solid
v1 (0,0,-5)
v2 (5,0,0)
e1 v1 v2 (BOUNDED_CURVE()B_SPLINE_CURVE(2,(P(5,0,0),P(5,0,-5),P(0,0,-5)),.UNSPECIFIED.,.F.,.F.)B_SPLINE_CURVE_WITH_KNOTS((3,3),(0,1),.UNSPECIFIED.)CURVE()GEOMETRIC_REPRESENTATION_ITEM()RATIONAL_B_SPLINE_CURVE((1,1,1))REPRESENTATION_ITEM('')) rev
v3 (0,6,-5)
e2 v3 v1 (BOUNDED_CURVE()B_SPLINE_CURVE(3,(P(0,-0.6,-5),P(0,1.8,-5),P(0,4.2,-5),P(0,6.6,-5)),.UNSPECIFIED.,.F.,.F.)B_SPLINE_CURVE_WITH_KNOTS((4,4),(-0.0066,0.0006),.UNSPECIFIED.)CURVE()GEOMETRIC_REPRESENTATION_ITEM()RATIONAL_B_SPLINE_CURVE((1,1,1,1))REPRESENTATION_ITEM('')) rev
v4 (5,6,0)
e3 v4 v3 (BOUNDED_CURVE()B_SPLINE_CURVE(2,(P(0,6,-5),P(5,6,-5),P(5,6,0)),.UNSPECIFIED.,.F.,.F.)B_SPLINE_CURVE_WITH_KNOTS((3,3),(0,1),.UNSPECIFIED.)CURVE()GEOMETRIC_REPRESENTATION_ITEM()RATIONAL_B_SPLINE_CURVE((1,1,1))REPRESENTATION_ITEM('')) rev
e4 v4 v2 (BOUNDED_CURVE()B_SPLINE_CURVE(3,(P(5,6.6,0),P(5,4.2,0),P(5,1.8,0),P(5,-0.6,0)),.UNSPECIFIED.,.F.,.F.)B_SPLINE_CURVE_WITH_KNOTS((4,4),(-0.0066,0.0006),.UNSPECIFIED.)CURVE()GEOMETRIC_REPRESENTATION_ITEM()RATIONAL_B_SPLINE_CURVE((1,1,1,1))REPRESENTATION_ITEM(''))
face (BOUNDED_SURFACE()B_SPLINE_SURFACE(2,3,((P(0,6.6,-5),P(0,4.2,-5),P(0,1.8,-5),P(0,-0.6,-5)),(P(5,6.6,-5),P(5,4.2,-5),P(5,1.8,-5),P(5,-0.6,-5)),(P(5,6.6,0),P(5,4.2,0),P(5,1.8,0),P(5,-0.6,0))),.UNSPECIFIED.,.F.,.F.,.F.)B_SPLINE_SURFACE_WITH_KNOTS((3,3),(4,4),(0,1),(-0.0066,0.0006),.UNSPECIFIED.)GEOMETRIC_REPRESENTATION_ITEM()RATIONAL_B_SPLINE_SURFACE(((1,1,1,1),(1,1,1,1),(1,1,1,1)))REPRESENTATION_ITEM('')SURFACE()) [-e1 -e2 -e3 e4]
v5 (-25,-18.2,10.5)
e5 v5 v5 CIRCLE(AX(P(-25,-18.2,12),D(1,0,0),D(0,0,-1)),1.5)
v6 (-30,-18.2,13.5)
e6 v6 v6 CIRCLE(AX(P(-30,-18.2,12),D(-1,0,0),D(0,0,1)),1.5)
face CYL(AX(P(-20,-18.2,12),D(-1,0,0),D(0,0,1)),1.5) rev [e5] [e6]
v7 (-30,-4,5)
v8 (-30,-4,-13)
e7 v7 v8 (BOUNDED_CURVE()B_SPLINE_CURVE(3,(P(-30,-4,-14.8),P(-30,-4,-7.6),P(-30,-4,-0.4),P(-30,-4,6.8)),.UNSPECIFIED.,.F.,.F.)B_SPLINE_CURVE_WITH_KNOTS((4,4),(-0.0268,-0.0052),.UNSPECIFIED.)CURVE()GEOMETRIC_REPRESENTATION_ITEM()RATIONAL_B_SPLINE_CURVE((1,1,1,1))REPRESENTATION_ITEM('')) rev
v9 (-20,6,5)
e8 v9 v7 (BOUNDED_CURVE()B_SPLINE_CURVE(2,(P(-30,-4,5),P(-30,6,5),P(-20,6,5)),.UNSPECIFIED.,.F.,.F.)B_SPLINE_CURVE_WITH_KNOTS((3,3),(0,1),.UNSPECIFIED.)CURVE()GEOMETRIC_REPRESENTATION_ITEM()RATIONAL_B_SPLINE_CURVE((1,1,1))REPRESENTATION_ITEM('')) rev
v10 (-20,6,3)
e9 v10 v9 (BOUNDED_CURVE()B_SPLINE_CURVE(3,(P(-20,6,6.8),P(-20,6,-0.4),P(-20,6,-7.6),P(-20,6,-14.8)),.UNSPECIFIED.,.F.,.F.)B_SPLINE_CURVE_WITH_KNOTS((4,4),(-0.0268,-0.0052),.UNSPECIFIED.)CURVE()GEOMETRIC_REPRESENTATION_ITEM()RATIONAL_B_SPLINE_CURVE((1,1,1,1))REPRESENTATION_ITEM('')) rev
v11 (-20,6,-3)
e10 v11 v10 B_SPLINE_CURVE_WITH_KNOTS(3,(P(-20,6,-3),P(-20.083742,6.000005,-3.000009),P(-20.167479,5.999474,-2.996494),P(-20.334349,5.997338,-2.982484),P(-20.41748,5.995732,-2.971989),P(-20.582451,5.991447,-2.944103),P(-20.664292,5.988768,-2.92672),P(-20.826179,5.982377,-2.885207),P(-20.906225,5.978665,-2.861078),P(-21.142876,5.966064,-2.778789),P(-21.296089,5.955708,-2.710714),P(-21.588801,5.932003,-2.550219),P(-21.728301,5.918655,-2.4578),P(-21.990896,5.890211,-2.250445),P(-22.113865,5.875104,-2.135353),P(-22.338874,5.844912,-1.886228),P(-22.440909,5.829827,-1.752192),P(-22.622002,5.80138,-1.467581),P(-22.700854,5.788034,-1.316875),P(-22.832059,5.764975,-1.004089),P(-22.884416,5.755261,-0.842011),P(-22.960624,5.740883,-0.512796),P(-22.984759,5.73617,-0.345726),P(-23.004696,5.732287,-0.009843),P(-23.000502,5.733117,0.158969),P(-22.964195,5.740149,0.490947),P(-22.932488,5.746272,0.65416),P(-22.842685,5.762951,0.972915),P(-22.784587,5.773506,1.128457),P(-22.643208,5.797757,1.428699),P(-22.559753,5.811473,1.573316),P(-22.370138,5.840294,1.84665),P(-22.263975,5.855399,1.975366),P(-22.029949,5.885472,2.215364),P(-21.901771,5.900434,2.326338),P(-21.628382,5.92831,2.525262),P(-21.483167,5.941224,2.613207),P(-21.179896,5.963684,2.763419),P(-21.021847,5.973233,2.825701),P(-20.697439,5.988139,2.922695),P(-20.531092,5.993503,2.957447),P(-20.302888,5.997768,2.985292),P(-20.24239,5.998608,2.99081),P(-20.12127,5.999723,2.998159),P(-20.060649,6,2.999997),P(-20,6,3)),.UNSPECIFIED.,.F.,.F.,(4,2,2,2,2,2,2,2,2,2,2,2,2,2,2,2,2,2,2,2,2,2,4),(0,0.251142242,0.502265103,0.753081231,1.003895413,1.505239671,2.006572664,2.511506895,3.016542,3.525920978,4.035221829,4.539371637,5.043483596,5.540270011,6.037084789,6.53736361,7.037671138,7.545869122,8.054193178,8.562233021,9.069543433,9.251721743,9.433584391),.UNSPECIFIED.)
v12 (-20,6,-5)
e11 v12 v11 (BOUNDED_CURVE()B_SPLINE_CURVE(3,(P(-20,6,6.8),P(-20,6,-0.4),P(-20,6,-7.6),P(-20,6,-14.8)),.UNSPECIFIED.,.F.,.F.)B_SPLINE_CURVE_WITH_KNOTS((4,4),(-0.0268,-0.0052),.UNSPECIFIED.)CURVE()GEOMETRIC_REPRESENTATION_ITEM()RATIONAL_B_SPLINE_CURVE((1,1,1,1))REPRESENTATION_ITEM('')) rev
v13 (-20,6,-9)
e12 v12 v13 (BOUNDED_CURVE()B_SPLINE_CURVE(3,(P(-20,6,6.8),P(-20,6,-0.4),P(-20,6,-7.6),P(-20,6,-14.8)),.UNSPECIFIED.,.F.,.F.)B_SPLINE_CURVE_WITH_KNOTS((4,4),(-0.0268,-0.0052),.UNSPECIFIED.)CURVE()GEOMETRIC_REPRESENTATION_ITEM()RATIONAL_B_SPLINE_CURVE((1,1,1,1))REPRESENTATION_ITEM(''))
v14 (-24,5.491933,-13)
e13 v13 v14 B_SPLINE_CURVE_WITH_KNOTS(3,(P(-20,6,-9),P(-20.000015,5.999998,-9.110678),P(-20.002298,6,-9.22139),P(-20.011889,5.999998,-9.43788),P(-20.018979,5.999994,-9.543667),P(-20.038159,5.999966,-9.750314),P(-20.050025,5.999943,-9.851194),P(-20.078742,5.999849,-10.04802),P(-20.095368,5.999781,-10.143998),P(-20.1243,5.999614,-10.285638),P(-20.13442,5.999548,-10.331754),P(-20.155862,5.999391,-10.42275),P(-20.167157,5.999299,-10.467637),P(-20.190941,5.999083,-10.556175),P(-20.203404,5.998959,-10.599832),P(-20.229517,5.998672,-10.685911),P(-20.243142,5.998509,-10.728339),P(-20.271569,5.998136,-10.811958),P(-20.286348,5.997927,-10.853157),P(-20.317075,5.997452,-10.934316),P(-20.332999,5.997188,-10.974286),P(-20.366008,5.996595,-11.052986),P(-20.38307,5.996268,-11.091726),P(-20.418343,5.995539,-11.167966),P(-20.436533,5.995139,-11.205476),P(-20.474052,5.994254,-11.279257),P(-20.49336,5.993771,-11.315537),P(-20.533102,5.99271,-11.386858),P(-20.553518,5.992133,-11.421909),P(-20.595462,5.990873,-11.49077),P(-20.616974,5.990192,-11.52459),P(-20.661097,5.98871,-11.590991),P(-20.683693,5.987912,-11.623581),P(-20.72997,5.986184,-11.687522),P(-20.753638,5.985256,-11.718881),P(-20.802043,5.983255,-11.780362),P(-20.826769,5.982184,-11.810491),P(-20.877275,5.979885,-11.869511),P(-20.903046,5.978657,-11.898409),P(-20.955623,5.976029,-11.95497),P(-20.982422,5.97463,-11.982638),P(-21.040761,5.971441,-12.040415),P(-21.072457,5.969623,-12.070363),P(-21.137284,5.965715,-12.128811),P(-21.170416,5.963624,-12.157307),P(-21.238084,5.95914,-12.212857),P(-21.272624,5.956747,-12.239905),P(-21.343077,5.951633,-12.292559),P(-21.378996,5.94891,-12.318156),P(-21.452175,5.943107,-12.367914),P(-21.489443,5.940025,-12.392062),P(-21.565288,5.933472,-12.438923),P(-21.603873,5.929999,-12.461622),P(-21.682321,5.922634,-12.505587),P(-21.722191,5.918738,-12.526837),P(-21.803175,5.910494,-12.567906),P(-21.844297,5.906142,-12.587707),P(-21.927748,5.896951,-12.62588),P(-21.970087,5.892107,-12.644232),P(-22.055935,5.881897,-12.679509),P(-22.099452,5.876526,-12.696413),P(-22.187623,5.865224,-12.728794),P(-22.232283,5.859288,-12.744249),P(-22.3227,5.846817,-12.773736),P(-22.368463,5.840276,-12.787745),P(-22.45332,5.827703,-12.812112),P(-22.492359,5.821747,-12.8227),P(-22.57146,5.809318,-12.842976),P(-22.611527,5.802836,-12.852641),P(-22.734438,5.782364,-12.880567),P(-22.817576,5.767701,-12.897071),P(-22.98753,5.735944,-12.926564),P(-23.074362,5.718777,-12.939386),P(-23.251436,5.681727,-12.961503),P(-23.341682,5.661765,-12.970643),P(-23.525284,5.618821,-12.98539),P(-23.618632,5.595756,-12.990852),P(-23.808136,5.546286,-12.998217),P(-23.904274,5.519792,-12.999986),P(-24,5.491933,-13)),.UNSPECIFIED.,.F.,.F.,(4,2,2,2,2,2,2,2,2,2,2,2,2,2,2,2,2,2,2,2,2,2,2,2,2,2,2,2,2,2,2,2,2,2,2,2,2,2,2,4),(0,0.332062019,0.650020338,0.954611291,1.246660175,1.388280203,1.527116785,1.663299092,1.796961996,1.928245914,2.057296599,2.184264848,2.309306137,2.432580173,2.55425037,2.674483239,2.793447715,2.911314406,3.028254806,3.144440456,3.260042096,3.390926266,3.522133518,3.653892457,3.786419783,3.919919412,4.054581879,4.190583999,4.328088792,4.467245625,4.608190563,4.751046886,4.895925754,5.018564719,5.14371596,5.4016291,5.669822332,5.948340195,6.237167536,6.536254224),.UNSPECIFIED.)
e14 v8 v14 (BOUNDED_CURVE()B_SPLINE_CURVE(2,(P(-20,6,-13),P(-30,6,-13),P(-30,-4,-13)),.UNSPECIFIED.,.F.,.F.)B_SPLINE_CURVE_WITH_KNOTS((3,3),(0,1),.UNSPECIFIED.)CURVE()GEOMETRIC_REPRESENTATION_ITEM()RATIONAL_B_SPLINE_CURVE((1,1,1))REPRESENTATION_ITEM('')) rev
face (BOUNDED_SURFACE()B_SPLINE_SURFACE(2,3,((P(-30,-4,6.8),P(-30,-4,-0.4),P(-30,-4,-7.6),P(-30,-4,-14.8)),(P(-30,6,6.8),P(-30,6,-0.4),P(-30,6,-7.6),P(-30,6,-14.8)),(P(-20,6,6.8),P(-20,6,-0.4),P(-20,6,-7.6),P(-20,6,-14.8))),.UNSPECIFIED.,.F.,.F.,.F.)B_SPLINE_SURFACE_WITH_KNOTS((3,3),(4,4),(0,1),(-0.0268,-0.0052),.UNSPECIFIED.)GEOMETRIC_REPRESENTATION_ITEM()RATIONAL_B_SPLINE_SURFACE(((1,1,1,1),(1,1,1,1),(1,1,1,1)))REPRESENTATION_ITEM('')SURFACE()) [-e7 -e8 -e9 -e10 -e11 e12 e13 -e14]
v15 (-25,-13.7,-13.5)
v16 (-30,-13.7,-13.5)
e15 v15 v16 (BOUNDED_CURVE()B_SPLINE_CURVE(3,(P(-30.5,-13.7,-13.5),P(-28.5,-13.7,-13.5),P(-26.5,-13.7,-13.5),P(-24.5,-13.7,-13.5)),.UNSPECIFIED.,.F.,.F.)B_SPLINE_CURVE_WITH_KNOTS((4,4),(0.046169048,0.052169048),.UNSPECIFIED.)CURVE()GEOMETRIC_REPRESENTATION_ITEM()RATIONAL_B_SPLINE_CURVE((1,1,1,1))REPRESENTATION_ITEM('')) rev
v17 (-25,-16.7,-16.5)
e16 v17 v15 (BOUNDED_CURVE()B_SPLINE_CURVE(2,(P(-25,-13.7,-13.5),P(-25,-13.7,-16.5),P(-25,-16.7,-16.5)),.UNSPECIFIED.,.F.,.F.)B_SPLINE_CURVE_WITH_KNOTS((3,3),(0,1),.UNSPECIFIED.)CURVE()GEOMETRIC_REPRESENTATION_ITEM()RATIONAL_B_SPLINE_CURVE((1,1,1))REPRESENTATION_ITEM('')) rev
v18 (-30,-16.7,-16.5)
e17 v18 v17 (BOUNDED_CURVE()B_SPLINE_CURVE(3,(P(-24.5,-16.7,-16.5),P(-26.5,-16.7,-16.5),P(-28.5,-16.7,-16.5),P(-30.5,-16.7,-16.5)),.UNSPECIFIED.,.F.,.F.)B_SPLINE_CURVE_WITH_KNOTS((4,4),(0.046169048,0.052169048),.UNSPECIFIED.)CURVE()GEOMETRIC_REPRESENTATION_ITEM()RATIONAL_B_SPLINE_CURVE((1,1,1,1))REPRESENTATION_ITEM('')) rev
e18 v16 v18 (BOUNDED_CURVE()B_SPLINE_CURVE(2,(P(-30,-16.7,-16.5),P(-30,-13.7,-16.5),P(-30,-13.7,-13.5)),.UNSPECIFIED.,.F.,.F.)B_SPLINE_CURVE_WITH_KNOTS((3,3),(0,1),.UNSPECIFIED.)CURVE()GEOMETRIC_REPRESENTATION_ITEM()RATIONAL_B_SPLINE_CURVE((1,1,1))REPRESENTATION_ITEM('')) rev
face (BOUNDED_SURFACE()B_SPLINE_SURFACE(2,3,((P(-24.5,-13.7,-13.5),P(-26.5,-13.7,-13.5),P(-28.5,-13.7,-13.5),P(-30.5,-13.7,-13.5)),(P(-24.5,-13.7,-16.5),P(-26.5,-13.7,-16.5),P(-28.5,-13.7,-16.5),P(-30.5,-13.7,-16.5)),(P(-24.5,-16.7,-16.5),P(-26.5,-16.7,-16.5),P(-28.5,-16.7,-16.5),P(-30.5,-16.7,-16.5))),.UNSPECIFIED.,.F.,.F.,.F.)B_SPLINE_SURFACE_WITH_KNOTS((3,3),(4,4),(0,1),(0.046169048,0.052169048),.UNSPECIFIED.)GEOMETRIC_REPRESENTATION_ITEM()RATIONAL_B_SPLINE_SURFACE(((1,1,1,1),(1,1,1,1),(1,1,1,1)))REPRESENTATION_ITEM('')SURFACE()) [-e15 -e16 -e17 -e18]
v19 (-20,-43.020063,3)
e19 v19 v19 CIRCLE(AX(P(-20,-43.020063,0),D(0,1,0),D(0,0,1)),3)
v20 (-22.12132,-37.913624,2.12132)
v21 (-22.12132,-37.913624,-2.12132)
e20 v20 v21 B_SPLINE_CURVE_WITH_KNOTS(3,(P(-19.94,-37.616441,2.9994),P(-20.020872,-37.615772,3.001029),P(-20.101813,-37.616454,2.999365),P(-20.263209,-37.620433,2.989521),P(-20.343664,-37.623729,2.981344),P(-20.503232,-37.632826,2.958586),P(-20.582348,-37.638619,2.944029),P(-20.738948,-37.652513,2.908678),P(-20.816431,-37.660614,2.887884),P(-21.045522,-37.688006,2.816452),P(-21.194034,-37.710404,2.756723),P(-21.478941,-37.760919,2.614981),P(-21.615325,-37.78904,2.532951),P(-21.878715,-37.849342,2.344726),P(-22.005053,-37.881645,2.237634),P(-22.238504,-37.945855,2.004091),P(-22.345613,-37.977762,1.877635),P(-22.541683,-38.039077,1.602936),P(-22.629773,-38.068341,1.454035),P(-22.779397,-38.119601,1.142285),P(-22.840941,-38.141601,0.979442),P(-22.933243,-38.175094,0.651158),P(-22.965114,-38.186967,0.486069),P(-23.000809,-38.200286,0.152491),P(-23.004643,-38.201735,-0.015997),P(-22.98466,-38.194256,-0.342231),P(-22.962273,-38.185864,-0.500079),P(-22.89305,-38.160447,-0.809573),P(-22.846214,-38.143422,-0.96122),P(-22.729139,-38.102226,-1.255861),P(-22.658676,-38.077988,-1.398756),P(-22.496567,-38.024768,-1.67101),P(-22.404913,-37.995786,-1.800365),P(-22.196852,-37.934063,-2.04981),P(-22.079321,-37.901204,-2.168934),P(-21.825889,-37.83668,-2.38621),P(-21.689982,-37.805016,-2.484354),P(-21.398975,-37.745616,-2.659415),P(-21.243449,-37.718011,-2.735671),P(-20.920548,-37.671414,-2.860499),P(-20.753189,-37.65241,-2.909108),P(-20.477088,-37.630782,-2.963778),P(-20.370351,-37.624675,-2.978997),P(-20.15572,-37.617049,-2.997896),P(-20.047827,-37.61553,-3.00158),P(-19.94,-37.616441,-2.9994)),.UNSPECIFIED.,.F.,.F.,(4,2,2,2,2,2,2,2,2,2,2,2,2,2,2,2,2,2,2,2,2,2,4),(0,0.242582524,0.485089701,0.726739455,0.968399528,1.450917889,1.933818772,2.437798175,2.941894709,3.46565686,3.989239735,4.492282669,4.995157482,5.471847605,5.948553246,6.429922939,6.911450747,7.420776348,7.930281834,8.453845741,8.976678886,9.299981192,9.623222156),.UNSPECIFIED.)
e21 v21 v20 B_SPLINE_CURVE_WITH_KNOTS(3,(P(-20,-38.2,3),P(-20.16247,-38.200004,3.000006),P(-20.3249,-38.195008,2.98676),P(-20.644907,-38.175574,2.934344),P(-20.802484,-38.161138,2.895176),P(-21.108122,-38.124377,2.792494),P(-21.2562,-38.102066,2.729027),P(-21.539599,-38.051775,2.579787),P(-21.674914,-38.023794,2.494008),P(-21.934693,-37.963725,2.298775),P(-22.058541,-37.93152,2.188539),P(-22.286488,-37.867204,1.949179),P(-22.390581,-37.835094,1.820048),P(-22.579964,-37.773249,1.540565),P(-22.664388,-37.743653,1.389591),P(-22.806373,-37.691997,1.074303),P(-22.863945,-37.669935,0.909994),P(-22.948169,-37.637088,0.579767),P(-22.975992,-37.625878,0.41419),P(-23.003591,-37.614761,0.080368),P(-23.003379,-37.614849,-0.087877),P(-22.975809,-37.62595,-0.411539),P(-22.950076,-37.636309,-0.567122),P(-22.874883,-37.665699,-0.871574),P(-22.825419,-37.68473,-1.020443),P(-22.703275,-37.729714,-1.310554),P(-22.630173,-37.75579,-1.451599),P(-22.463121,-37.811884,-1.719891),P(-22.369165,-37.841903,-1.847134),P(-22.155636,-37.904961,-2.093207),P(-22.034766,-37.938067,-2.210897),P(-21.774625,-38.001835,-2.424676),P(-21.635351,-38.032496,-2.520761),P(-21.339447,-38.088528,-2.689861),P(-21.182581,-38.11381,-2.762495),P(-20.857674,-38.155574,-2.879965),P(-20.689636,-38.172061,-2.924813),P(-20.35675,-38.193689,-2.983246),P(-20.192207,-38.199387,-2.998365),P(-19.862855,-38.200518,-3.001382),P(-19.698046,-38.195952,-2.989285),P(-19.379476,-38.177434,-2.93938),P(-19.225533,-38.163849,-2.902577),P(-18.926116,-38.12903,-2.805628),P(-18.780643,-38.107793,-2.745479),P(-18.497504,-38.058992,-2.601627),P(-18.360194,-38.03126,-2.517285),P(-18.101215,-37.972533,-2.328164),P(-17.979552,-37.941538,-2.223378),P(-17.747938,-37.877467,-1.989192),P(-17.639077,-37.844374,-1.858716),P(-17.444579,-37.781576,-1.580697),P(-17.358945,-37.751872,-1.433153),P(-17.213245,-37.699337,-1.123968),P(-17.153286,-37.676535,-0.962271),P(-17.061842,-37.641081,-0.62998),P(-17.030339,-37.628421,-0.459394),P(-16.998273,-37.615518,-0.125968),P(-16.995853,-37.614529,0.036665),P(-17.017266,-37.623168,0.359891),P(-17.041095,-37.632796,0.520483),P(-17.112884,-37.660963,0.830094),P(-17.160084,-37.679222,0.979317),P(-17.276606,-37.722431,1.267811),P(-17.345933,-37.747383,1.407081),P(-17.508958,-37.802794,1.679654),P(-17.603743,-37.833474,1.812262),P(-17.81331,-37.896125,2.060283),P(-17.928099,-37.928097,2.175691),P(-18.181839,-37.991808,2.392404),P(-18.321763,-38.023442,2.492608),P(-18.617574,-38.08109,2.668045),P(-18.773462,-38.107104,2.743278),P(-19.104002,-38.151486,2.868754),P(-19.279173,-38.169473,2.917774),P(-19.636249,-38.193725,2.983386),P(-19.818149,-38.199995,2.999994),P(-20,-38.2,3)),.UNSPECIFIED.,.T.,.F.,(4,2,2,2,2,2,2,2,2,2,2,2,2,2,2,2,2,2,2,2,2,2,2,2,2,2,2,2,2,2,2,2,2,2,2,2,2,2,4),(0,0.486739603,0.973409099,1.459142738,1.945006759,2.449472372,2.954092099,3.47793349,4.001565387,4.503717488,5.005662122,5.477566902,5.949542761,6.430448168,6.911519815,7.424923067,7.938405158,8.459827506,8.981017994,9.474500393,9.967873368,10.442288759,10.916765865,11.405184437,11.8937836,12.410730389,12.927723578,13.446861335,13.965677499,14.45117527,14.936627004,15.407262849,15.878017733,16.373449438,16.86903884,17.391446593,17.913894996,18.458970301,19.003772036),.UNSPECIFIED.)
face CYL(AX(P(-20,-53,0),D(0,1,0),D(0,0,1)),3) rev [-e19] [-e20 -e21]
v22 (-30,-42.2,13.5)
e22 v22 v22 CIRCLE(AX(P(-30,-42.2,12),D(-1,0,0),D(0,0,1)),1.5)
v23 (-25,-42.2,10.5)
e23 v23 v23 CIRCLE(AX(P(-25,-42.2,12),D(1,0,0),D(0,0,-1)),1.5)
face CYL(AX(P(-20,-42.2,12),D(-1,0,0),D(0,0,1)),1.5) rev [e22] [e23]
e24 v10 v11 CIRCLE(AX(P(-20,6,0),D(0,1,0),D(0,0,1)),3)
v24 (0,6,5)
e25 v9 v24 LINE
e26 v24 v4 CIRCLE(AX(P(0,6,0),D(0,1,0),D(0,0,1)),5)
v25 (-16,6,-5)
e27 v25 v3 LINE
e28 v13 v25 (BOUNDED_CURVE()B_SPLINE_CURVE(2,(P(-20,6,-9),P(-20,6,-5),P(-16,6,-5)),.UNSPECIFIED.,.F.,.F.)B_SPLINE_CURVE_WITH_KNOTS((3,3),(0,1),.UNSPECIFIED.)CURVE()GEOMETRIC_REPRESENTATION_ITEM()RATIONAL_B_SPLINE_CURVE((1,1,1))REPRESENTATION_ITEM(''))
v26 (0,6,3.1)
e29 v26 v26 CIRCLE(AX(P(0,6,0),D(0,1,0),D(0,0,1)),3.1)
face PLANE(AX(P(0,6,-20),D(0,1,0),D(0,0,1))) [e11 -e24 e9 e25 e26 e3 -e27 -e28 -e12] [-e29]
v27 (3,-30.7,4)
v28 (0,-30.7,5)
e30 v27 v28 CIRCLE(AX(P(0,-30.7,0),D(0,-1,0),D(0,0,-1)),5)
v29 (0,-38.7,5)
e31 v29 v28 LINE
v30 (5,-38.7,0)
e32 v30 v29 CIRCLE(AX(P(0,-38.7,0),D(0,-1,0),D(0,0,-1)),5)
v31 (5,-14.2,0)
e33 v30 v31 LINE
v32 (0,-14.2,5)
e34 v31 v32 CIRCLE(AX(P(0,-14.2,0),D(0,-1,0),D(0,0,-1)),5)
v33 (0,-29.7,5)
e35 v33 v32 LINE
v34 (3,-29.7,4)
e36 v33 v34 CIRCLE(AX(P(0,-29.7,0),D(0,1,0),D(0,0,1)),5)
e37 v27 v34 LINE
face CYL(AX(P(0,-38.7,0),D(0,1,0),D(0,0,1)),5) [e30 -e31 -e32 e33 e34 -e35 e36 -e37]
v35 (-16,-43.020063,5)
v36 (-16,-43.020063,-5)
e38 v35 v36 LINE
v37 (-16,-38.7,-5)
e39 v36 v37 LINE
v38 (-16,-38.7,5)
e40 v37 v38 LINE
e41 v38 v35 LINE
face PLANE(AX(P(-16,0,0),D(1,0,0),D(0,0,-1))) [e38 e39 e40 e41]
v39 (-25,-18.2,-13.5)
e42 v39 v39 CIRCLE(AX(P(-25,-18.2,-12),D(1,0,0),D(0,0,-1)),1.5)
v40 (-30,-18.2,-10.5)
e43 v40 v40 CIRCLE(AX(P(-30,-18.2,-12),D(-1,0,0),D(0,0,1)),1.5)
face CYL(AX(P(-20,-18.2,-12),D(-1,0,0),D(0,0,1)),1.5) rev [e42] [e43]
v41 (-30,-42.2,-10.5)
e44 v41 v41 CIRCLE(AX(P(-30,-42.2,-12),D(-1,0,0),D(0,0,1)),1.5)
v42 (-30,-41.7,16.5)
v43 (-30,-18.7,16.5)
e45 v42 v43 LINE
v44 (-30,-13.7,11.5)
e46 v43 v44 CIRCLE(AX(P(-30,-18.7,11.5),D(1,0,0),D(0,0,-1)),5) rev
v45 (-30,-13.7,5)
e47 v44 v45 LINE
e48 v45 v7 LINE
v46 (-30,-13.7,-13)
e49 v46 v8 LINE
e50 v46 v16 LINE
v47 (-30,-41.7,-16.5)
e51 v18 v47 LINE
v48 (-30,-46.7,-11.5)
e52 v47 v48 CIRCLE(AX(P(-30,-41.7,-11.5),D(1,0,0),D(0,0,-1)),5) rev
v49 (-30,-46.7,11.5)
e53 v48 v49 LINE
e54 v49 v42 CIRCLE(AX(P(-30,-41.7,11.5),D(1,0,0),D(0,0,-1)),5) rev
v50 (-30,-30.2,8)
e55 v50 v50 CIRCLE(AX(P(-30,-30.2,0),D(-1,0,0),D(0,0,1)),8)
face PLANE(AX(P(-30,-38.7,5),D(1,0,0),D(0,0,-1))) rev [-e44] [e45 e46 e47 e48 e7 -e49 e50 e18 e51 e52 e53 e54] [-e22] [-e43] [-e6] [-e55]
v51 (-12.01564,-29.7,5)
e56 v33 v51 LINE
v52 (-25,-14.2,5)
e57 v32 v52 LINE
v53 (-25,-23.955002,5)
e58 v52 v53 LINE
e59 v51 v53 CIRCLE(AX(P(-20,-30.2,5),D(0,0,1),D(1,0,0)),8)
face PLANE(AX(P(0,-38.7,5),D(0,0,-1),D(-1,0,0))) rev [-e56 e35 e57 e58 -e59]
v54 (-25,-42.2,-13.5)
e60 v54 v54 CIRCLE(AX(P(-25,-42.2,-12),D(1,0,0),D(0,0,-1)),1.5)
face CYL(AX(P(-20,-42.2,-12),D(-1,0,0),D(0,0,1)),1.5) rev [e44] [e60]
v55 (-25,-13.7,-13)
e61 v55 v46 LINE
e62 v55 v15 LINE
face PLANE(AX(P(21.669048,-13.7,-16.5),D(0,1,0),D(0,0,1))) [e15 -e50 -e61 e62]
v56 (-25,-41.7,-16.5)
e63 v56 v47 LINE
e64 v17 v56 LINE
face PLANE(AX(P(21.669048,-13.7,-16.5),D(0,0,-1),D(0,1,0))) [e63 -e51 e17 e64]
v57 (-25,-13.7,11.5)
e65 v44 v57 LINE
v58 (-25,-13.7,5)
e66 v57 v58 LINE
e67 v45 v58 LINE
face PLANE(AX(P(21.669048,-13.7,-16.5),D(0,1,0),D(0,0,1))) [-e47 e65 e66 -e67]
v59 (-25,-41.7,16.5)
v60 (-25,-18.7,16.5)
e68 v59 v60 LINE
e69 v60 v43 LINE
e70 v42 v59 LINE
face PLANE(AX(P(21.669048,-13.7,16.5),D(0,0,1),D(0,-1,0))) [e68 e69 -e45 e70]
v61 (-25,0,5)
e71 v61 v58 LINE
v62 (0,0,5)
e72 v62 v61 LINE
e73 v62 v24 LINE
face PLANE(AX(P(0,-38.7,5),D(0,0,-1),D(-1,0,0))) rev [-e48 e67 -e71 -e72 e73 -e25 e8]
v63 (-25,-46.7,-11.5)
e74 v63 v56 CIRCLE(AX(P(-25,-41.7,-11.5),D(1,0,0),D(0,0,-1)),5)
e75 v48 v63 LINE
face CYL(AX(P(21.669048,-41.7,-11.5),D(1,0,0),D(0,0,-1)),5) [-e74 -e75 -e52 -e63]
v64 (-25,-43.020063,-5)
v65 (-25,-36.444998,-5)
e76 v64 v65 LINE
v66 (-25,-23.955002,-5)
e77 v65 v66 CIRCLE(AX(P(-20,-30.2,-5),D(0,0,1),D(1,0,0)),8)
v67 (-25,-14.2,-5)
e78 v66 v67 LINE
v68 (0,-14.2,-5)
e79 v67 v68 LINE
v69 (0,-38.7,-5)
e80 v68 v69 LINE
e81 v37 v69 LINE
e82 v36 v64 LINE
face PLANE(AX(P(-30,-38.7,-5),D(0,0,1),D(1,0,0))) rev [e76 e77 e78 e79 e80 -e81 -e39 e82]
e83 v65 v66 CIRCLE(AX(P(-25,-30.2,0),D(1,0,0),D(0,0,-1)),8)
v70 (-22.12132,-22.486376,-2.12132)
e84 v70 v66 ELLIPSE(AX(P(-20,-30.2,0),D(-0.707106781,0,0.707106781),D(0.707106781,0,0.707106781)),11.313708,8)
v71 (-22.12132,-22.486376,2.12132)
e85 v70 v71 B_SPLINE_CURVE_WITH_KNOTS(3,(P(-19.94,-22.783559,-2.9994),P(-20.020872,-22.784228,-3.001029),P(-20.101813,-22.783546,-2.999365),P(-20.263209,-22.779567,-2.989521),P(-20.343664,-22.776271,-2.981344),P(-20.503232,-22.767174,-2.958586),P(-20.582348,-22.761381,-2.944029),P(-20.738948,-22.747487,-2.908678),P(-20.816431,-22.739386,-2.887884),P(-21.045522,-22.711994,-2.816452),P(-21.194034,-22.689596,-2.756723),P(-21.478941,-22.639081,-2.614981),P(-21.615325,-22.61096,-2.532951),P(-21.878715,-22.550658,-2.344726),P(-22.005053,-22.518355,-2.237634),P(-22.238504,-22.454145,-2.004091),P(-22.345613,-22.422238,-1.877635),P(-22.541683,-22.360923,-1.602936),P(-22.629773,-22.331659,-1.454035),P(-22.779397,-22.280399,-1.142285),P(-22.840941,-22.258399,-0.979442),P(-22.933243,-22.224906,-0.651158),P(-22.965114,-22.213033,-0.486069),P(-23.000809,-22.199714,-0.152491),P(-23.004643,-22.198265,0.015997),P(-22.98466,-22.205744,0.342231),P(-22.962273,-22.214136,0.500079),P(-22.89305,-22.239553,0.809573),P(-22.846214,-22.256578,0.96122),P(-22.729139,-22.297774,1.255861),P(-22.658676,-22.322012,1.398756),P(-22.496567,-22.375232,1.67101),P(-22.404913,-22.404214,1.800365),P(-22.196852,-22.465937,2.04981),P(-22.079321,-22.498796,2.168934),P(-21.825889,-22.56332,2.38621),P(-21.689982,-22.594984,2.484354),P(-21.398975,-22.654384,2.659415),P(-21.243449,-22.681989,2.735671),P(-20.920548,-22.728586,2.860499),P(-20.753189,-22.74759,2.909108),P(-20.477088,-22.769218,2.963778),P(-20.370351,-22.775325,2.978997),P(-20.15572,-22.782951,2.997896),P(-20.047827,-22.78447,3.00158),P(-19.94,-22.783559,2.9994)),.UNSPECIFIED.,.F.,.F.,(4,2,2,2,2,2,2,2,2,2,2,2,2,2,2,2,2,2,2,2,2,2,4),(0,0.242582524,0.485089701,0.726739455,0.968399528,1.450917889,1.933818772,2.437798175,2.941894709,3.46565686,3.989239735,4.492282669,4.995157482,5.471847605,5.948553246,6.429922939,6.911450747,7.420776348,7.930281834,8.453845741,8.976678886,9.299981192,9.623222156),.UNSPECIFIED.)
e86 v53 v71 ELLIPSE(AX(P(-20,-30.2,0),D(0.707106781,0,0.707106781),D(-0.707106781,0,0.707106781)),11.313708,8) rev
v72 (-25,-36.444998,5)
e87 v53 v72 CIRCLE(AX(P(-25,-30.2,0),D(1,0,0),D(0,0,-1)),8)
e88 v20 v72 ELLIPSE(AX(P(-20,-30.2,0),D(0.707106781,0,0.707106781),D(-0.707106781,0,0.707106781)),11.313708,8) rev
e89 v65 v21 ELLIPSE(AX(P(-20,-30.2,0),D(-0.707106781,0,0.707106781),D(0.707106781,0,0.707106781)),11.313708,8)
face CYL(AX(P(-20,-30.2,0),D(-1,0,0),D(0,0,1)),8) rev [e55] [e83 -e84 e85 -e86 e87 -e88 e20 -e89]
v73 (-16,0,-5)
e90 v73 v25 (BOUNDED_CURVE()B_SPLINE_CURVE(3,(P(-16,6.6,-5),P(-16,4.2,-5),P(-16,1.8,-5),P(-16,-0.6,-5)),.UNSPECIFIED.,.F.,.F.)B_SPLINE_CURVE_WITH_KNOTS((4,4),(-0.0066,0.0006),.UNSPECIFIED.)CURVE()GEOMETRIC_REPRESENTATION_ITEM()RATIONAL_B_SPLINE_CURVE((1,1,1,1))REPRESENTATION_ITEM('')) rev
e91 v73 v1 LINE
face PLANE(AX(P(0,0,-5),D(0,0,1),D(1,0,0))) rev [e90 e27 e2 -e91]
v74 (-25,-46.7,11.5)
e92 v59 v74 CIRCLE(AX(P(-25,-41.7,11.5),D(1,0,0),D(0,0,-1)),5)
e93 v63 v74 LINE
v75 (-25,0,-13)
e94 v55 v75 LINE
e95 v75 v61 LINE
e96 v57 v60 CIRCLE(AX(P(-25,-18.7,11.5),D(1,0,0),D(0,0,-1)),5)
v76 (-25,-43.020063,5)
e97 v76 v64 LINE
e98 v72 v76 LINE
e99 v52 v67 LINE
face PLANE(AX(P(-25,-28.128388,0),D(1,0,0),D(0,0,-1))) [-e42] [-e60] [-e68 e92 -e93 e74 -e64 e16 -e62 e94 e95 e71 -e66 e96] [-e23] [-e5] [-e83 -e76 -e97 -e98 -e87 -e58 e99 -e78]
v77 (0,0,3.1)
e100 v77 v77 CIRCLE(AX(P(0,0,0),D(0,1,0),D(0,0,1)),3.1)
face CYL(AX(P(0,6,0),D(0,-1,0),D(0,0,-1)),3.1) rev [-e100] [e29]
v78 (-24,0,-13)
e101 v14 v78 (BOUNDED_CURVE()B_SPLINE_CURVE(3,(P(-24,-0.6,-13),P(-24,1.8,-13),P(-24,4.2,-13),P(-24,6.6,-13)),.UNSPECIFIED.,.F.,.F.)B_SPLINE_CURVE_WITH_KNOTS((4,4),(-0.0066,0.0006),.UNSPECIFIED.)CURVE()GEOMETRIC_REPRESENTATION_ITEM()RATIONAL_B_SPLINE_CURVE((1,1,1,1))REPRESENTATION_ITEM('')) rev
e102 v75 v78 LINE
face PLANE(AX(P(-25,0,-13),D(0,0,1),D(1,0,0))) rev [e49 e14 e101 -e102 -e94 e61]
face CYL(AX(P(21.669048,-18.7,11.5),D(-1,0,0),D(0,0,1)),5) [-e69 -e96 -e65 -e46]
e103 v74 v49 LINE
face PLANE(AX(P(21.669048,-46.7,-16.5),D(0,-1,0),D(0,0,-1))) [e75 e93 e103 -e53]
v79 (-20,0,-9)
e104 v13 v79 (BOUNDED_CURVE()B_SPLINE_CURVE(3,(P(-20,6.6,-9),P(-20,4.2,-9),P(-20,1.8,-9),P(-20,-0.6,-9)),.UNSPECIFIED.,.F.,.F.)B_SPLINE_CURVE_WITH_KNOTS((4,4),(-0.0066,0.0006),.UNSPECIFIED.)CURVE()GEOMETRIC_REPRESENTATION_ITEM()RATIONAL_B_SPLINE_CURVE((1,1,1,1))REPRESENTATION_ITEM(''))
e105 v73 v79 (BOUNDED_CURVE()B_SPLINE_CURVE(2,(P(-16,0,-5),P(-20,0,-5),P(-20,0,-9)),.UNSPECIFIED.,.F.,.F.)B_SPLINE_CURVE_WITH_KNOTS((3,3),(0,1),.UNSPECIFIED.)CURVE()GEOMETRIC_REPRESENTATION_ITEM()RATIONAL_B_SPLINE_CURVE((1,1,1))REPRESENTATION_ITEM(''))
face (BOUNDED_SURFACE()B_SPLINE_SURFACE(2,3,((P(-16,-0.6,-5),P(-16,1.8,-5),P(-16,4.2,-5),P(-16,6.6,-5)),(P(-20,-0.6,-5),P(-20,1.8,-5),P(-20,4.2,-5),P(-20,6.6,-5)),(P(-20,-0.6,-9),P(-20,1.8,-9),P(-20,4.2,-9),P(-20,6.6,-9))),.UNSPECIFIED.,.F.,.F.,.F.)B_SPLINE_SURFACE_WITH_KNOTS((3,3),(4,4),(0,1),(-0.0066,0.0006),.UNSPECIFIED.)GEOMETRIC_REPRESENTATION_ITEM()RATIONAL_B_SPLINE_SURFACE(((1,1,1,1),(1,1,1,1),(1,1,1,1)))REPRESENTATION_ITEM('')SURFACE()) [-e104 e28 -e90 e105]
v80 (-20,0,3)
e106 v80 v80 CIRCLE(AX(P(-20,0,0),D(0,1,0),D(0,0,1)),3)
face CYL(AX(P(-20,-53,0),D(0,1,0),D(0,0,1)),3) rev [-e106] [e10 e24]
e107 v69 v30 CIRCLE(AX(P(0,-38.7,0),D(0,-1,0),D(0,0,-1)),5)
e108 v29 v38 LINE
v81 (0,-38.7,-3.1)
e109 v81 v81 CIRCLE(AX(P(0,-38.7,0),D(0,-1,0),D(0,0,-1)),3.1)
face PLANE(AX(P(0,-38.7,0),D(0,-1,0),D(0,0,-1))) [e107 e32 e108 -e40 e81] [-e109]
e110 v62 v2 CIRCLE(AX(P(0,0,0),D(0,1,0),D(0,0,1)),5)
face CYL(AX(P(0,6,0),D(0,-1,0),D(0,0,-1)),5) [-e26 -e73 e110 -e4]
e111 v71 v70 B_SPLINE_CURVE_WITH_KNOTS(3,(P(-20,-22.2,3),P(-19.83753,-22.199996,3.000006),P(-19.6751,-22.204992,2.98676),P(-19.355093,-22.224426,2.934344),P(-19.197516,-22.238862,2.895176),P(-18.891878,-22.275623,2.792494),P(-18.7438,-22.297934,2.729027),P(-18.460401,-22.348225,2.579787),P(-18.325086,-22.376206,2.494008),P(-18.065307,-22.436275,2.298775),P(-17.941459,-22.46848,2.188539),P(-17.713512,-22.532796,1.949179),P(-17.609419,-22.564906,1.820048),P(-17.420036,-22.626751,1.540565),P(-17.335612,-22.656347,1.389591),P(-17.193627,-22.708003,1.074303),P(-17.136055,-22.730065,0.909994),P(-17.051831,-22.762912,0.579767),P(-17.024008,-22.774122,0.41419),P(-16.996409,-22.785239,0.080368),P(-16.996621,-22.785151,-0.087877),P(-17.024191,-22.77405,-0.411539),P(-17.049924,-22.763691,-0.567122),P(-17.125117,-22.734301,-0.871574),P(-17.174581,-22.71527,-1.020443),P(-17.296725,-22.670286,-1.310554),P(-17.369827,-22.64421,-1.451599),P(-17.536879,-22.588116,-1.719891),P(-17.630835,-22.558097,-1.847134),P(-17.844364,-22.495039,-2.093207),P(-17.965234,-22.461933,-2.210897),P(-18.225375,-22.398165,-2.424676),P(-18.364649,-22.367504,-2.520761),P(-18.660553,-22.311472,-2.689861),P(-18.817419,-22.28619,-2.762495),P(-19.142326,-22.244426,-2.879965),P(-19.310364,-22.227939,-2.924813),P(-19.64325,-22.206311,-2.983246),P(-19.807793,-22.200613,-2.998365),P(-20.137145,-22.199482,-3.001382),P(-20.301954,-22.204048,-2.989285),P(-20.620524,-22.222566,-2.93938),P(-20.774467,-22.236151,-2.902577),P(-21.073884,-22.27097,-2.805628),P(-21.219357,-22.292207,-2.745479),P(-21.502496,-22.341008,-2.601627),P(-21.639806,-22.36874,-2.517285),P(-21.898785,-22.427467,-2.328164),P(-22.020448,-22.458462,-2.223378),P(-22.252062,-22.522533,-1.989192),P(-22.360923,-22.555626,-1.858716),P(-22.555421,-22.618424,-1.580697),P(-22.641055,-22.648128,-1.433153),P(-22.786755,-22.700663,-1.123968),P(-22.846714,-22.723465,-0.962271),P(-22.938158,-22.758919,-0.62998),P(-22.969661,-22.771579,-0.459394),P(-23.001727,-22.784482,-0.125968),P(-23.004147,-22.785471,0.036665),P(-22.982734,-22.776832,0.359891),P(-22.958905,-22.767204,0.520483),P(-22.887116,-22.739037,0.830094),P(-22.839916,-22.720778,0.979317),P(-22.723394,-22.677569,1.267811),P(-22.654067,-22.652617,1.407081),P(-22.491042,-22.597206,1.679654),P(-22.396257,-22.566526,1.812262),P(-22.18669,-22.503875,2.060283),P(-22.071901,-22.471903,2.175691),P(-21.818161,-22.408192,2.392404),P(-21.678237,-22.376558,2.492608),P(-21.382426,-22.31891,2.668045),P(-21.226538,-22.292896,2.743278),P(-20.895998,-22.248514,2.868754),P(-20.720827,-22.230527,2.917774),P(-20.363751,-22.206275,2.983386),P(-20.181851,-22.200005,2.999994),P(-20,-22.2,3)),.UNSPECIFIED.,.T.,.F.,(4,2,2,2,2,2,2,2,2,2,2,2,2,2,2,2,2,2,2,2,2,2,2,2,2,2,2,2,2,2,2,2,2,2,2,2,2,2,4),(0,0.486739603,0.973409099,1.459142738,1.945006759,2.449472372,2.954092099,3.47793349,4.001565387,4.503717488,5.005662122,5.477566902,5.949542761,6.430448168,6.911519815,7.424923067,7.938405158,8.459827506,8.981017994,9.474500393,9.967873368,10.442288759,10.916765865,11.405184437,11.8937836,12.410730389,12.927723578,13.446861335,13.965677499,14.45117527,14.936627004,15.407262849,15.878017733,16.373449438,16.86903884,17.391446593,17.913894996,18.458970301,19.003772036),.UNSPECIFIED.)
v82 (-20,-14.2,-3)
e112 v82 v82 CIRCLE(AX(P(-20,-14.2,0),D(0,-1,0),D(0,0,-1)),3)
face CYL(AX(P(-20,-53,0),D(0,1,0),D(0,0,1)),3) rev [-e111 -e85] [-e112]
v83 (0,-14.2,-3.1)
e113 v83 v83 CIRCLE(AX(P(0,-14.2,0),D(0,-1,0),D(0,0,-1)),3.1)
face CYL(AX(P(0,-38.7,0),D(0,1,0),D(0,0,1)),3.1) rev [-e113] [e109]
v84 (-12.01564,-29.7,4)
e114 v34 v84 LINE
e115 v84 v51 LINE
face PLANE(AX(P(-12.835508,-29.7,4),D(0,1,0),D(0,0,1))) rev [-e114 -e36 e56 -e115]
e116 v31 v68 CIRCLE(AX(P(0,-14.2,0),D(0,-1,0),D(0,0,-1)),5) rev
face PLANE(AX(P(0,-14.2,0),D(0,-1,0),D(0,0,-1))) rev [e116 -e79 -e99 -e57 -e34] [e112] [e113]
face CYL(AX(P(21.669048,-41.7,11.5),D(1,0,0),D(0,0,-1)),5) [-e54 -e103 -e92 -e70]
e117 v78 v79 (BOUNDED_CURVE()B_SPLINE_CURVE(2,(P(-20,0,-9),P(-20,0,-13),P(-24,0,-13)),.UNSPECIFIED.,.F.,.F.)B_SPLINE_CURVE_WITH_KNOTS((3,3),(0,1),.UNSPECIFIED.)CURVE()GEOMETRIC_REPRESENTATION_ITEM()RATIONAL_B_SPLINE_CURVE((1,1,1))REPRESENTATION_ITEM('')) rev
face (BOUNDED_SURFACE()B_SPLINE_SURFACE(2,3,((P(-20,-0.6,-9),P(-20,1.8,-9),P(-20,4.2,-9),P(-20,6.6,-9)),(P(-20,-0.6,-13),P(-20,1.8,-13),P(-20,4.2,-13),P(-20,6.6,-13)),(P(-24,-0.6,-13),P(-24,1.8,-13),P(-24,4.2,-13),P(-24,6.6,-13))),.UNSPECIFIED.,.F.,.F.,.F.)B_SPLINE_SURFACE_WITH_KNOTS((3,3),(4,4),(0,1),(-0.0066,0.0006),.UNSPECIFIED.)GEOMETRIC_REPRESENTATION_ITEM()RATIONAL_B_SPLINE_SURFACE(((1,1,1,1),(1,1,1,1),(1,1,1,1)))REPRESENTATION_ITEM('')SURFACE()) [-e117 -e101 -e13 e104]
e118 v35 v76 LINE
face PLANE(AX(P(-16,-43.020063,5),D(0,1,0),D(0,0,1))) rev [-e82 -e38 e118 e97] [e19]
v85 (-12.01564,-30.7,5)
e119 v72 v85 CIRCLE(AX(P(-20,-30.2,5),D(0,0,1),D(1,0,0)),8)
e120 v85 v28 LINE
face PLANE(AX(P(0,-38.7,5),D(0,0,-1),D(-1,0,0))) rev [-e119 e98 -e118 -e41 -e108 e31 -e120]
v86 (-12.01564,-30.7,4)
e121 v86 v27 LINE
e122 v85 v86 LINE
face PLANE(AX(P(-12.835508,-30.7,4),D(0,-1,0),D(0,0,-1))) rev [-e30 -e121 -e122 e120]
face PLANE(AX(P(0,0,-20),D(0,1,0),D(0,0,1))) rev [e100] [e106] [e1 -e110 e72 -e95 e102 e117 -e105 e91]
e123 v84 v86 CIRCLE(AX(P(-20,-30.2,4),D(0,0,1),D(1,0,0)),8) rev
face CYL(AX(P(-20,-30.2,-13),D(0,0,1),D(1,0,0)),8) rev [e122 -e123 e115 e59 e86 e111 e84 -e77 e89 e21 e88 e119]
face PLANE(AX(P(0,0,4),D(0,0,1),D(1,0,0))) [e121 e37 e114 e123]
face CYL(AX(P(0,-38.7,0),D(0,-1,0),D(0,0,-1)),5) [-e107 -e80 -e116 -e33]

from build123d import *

# Parameters (mm, degrees)
CROQUIS1_R              = 3
CROQUIS1_R_2            = 3.1
SALIENTE_EXTRUIR1_DEPTH = 6
CROQUIS2_W              = 10
CROQUIS2_H              = 3
SALIENTE_EXTRUIR2_DEPTH = 14.2
SALIENTE_EXTRUIR3_START = 24.5
CROQUIS3_R              = 3.1
SALIENTE_EXTRUIR3_DEPTH = 24.5
CROQUIS6_R              = 8
CORTAR_EXTRUIR1_DEPTH   = 18
REDONDEO1_R             = 5
CROQUIS7_W              = 17.859034053
CROQUIS7_H              = 1
CORTAR_EXTRUIR2_DEPTH   = 1
CROQUIS8_W              = 13
CROQUIS8_H              = 6
SALIENTE_EXTRUIR4_DEPTH = 20
CROQUIS9_W              = 5
CROQUIS9_H              = 13
SALIENTE_EXTRUIR5_DEPTH = 20.2
CROQUIS10_W             = 3
CROQUIS10_H             = 14.2
CORTAR_EXTRUIR3_DEPTH   = 20
SALIENTE_EXTRUIR6_DEPTH = 5
SALIENTE_EXTRUIR7_DEPTH = 6
REDONDEO2_R             = 4
CROQUIS13_W             = 15
CROQUIS13_H             = 24.5
CORTAR_EXTRUIR4_DEPTH   = 11
REDONDEO3_R             = 4
REDONDEO4_R             = 5
REDONDEO9_SIZE          = 10
CROQUIS15_W             = 23.51054635
CROQUIS15_H             = 8.430737454
CORTAR_EXTRUIR6_DEPTH   = 12.311914061
REDONDEO10_R            = 5
CROQUIS16_W             = 33
CROQUIS16_H             = 33
SALIENTE_EXTRUIR8_DEPTH = 5
CROQUIS18_R             = 1.5
CORTAR_EXTRUIR7_DEPTH   = 10
CROQUIS19_R             = 8
CORTAR_EXTRUIR8_DEPTH   = 10
REDONDEO13_R            = 5
REDONDEO14_R            = 5
REDONDEO15_R            = 5
REDONDEO17_SIZE         = 3
CROQUIS20_W             = 26.447439695
CROQUIS20_H             = 7.153283898
CORTAR_EXTRUIR9_DEPTH   = 8
REDONDEO18_DEPTH        = 6
REDONDEO19_SIZE         = 4
REDONDEO20_SIZE         = 5
CROQUIS21_W             = 10
CROQUIS21_H             = 4.320063387
SALIENTE_EXTRUIR9_DEPTH = 9
CROQUIS14_R             = 3
CORTAR_EXTRUIR5_DEPTH   = 59


with BuildPart() as part:
    # Croquis1 → Saliente-Extruir1 (new body)
    with BuildSketch(Plane(origin=(0, 0, 0), x_dir=(1, 0, 0), z_dir=(0, 1, 0))):
        with BuildLine():
            Line((-5, 20), (-5, 0))
            ThreePointArc((-5, 0), (0, -5), (5, 0))
            Line((5, 0), (5, 20))
            ThreePointArc((5, 20), (0, 25), (-5, 20))
        make_face()
        with Locations(Location((0, 20, 0), (0, 0, 270))):
            Circle(CROQUIS1_R, mode=Mode.SUBTRACT)
        with Locations(Location((0, 0, 0), (0, 0, 270))):
            Circle(CROQUIS1_R_2, mode=Mode.SUBTRACT)
    extrude(amount=SALIENTE_EXTRUIR1_DEPTH)

    # Croquis2 → Saliente-Extruir2 (add)
    with BuildSketch(Plane.XZ):
        with Locations((0, -14.5)):
            Rectangle(CROQUIS2_W, CROQUIS2_H)
    extrude(amount=SALIENTE_EXTRUIR2_DEPTH)

    # Croquis3 → Saliente-Extruir3 (add)
    with BuildSketch(Plane.XZ.offset(14.2).offset(SALIENTE_EXTRUIR3_START)):
        with BuildLine():
            Line((-5, -5), (-5, -16))
            Line((-5, -16), (5, -16))
            Line((5, -16), (5, 0))
            ThreePointArc((5, 0), (3.535533906, 3.535533906), (0, 5))
            Line((0, 5), (-30, 5))
            Line((-30, 5), (-30, -5))
            Line((-30, -5), (-5, -5))
        make_face()
        with Locations(Location((0, 0, 0), (0, 0, 90))):
            Circle(CROQUIS3_R, mode=Mode.SUBTRACT)
    extrude(amount=-SALIENTE_EXTRUIR3_DEPTH)

    # Croquis6 → Cortar-Extruir1 (cut)
    with BuildSketch(Plane.XY.offset(5)):
        with Locations((-20, -30.2)):
            Circle(CROQUIS6_R)
    extrude(amount=-CORTAR_EXTRUIR1_DEPTH, mode=Mode.SUBTRACT)

    # Redondeo1
    redondeo1_edges = [part.edges().sort_by_distance(p)[0] for p in [
        (-5, -26.45, -5),
    ]]
    fillet(redondeo1_edges, radius=REDONDEO1_R)

    # Croquis7 → Cortar-Extruir2 (cut)
    with BuildSketch(Plane.XY.offset(5)):
        with Locations((-3.905990917, -30.2)):
            Rectangle(CROQUIS7_W, CROQUIS7_H)
    extrude(amount=-CORTAR_EXTRUIR2_DEPTH, mode=Mode.SUBTRACT)

    # Croquis8 → Saliente-Extruir4 (add)
    with BuildSketch(Plane.ZY.offset(5)):
        with Locations((-6.5, 3)):
            Rectangle(CROQUIS8_W, CROQUIS8_H)
    extrude(amount=SALIENTE_EXTRUIR4_DEPTH)

    # Croquis9 → Saliente-Extruir5 (add)
    with BuildSketch(Plane(origin=(0, 6, 0), x_dir=(1, 0, 0), z_dir=(0, 1, 0))):
        with Locations((-27.5, 6.5)):
            Rectangle(CROQUIS9_W, CROQUIS9_H)
    extrude(amount=-SALIENTE_EXTRUIR5_DEPTH)

    # Croquis10 → Cortar-Extruir3 (cut)
    with BuildSketch(Plane.ZY.offset(5)):
        with Locations((-14.5, -7.1)):
            Rectangle(CROQUIS10_W, CROQUIS10_H)
    extrude(amount=-CORTAR_EXTRUIR3_DEPTH, mode=Mode.SUBTRACT)

    # Croquis11 → Saliente-Extruir6 (add)
    with BuildSketch(Plane.XY):
        Polygon((-5, 0), (-5, 6), (-30, 6), (-30, -14.2), (-25, -14.2), (-25, 0), align=None)
    extrude(amount=SALIENTE_EXTRUIR6_DEPTH)

    # Croquis12 → Saliente-Extruir7 (add)
    with BuildSketch(Plane(origin=(0, 6, 0), x_dir=(1, 0, 0), z_dir=(0, 1, 0))):
        Polygon((-5, -5), (0, -5), (-4.695965468, 0.35178881), (-6.407055534, -0.228241721), align=None)
    extrude(amount=-SALIENTE_EXTRUIR7_DEPTH)

    # Redondeo2
    # the kernel refuses this fillet: 4 mm, written as the material it adds along each edge
    with BuildSketch(Plane(origin=(-30, -14.2, -5), x_dir=(0, 0, -1), z_dir=(1, 0, 0))) as redondeo2_piece_1:
        with BuildLine():
            CenterArc((REDONDEO2_R, -REDONDEO2_R), REDONDEO2_R, 90, 90)
            Line((0, -REDONDEO2_R), (0, 0))
            Line((0, 0), (REDONDEO2_R, 0))
        make_face()
    extrude(amount=5)

    # Croquis13 → Cortar-Extruir4 (cut)
    with BuildSketch(Plane(origin=(0, 0, -16), x_dir=(-1, 0, 0), z_dir=(0, 0, -1))):
        with Locations((2.5, -26.45)):
            Rectangle(CROQUIS13_W, CROQUIS13_H)
    extrude(amount=-CORTAR_EXTRUIR4_DEPTH, mode=Mode.SUBTRACT)

    # Redondeo3
    redondeo3_edges = [part.edges().sort_by_distance(p)[0] for p in [
        (-5, 3, -13),
    ]]
    fillet(redondeo3_edges, radius=REDONDEO3_R)

    # Redondeo4
    redondeo4_edges = [part.edges().sort_by_distance(p)[0] for p in [
        (5, -26.45, -5),
    ]]
    fillet(redondeo4_edges, radius=REDONDEO4_R - 0.0001)  # a hair under: the kernel refuses the full size

    # Redondeo9
    # a fillet whose section is not a circle: 10 mm, written as the material it takes off along each edge
    with BuildSketch(Plane(origin=(-30, 6, 30), x_dir=(0, -1, 0), z_dir=(0, 0, -1))) as redondeo9_piece_1:
        with BuildLine():
            Bezier((REDONDEO9_SIZE, 0), (0, 0), (0, -REDONDEO9_SIZE), weights=[1, 1, 1])
            Line((0, -REDONDEO9_SIZE), (0, 0))
            Line((0, 0), (REDONDEO9_SIZE, 0))
        make_face()
    extrude(amount=68, mode=Mode.SUBTRACT)

    # Croquis15 → Cortar-Extruir6 (cut)
    with BuildSketch(Plane.XY.offset(-25.311914061)):
        with Locations((-4.843890072, 4.215368727)):
            Rectangle(CROQUIS15_W, CROQUIS15_H)
    extrude(amount=CORTAR_EXTRUIR6_DEPTH, mode=Mode.SUBTRACT)

    # Redondeo10
    redondeo10_edges = [part.edges().sort_by_distance(p)[0] for p in [
        (5, 3, -13),
    ]]
    fillet(redondeo10_edges, radius=REDONDEO10_R)

    # Croquis16 → Saliente-Extruir8 (add)
    with BuildSketch(Plane.ZY.offset(30)):
        with Locations((0, -30.2)):
            Rectangle(CROQUIS16_W, CROQUIS16_H)
    extrude(amount=-SALIENTE_EXTRUIR8_DEPTH)

    # Croquis18 → Cortar-Extruir7 (cut)
    with BuildSketch(Plane.ZY.offset(30)):
        with Locations((12, -42.2)):
            Circle(CROQUIS18_R)
        with Locations((-12, -42.2)):
            Circle(CROQUIS18_R)
        with Locations((-12, -18.2)):
            Circle(CROQUIS18_R)
        with Locations((12, -18.2)):
            Circle(CROQUIS18_R)
    extrude(amount=-CORTAR_EXTRUIR7_DEPTH, mode=Mode.SUBTRACT)

    # Croquis19 → Cortar-Extruir8 (cut)
    with BuildSketch(Plane.ZY.offset(30)):
        with Locations((0, -30.2)):
            Circle(CROQUIS19_R)
    extrude(amount=-CORTAR_EXTRUIR8_DEPTH, mode=Mode.SUBTRACT)

    # Redondeo13
    redondeo13_edges = [part.edges().sort_by_distance(p)[0] for p in [
        (-27.5, -13.7, 16.5),
    ]]
    fillet(redondeo13_edges, radius=REDONDEO13_R)

    # Redondeo14
    redondeo14_edges = [part.edges().sort_by_distance(p)[0] for p in [
        (-27.5, -46.7, 16.5),
    ]]
    fillet(redondeo14_edges, radius=REDONDEO14_R)

    # Redondeo15
    redondeo15_edges = [part.edges().sort_by_distance(p)[0] for p in [
        (-27.5, -46.7, -16.5),
    ]]
    fillet(redondeo15_edges, radius=REDONDEO15_R)

    # Redondeo17
    # a fillet whose section is not a circle: 3 mm, written as the material it takes off along each edge
    with BuildSketch(Plane(origin=(-37.5, -13.7, -16.5), x_dir=(0, -1, 0), z_dir=(1, 0, 0))) as redondeo17_piece_1:
        with BuildLine():
            Bezier((REDONDEO17_SIZE, 0), (0, 0), (0, -REDONDEO17_SIZE), weights=[1, 1, 1])
            Line((0, -REDONDEO17_SIZE), (0, 0))
            Line((0, 0), (REDONDEO17_SIZE, 0))
        make_face()
    extrude(amount=20, mode=Mode.SUBTRACT)

    # Croquis20 → Cortar-Extruir9 (cut)
    with BuildSketch(Plane(origin=(0, 0, -13), x_dir=(-1, 0, 0), z_dir=(0, 0, -1))):
        with Locations((6.776280153, 2.423358051)):
            Rectangle(CROQUIS20_W, CROQUIS20_H)
    extrude(amount=-CORTAR_EXTRUIR9_DEPTH, mode=Mode.SUBTRACT)

    # Redondeo18: read off the stored shape, not the designer's step
    # Redondeo18 outline → Redondeo18 (add)
    with BuildSketch(Plane(origin=(0, 0, 0), x_dir=(1, 0, 0), z_dir=(0, 1, 0))):
        with BuildLine():
            Line((-20, 5), (-16, 5))
            add(Edge.make_bspline(
                [(-16, 5), (-20, 5), (-20, 9)],
                knots=[0, 0, 0, 1, 1, 1], degree=2))
            Line((-20, 9), (-20, 5))
        make_face()
    extrude(amount=REDONDEO18_DEPTH)

    # Redondeo19
    # a fillet whose section is not a circle: 4 mm, written as the material it takes off along each edge
    with BuildSketch(Plane(origin=(-20, -10, -13), x_dir=(0, 0, 1), z_dir=(0, 1, 0))) as redondeo19_piece_1:
        with BuildLine():
            Bezier((REDONDEO19_SIZE, 0), (0, 0), (0, -REDONDEO19_SIZE), weights=[1, 1, 1])
            Line((0, -REDONDEO19_SIZE), (0, 0))
            Line((0, 0), (REDONDEO19_SIZE, 0))
        make_face()
    extrude(amount=26, mode=Mode.SUBTRACT)

    # Redondeo20
    # a fillet whose section is not a circle: 5 mm, written as the material it takes off along each edge
    with BuildSketch(Plane(origin=(5, 18.5, -5), x_dir=(-1, 0, 0), z_dir=(0, -1, 0))) as redondeo20_piece_1:
        with BuildLine():
            Bezier((REDONDEO20_SIZE, 0), (0, 0), (0, -REDONDEO20_SIZE), weights=[1, 1, 1])
            Line((0, -REDONDEO20_SIZE), (0, 0))
            Line((0, 0), (REDONDEO20_SIZE, 0))
        make_face()
    extrude(amount=31, mode=Mode.SUBTRACT)

    # Croquis21 → Saliente-Extruir9 (add)
    with BuildSketch(Plane(origin=(-25, 0, 0), x_dir=(0, 0, -1), z_dir=(1, 0, 0))):
        with Locations((0, -40.860031694)):
            Rectangle(CROQUIS21_W, CROQUIS21_H)
    extrude(amount=SALIENTE_EXTRUIR9_DEPTH)

    # Croquis14 → Cortar-Extruir5 (cut)
    with BuildSketch(Plane(origin=(0, 6, 0), x_dir=(1, 0, 0), z_dir=(0, 1, 0))):
        with Locations(Location((-20, 0, 0), (0, 0, 270))):
            Circle(CROQUIS14_R)
    extrude(amount=-CORTAR_EXTRUIR5_DEPTH, mode=Mode.SUBTRACT)


solid = part.part
